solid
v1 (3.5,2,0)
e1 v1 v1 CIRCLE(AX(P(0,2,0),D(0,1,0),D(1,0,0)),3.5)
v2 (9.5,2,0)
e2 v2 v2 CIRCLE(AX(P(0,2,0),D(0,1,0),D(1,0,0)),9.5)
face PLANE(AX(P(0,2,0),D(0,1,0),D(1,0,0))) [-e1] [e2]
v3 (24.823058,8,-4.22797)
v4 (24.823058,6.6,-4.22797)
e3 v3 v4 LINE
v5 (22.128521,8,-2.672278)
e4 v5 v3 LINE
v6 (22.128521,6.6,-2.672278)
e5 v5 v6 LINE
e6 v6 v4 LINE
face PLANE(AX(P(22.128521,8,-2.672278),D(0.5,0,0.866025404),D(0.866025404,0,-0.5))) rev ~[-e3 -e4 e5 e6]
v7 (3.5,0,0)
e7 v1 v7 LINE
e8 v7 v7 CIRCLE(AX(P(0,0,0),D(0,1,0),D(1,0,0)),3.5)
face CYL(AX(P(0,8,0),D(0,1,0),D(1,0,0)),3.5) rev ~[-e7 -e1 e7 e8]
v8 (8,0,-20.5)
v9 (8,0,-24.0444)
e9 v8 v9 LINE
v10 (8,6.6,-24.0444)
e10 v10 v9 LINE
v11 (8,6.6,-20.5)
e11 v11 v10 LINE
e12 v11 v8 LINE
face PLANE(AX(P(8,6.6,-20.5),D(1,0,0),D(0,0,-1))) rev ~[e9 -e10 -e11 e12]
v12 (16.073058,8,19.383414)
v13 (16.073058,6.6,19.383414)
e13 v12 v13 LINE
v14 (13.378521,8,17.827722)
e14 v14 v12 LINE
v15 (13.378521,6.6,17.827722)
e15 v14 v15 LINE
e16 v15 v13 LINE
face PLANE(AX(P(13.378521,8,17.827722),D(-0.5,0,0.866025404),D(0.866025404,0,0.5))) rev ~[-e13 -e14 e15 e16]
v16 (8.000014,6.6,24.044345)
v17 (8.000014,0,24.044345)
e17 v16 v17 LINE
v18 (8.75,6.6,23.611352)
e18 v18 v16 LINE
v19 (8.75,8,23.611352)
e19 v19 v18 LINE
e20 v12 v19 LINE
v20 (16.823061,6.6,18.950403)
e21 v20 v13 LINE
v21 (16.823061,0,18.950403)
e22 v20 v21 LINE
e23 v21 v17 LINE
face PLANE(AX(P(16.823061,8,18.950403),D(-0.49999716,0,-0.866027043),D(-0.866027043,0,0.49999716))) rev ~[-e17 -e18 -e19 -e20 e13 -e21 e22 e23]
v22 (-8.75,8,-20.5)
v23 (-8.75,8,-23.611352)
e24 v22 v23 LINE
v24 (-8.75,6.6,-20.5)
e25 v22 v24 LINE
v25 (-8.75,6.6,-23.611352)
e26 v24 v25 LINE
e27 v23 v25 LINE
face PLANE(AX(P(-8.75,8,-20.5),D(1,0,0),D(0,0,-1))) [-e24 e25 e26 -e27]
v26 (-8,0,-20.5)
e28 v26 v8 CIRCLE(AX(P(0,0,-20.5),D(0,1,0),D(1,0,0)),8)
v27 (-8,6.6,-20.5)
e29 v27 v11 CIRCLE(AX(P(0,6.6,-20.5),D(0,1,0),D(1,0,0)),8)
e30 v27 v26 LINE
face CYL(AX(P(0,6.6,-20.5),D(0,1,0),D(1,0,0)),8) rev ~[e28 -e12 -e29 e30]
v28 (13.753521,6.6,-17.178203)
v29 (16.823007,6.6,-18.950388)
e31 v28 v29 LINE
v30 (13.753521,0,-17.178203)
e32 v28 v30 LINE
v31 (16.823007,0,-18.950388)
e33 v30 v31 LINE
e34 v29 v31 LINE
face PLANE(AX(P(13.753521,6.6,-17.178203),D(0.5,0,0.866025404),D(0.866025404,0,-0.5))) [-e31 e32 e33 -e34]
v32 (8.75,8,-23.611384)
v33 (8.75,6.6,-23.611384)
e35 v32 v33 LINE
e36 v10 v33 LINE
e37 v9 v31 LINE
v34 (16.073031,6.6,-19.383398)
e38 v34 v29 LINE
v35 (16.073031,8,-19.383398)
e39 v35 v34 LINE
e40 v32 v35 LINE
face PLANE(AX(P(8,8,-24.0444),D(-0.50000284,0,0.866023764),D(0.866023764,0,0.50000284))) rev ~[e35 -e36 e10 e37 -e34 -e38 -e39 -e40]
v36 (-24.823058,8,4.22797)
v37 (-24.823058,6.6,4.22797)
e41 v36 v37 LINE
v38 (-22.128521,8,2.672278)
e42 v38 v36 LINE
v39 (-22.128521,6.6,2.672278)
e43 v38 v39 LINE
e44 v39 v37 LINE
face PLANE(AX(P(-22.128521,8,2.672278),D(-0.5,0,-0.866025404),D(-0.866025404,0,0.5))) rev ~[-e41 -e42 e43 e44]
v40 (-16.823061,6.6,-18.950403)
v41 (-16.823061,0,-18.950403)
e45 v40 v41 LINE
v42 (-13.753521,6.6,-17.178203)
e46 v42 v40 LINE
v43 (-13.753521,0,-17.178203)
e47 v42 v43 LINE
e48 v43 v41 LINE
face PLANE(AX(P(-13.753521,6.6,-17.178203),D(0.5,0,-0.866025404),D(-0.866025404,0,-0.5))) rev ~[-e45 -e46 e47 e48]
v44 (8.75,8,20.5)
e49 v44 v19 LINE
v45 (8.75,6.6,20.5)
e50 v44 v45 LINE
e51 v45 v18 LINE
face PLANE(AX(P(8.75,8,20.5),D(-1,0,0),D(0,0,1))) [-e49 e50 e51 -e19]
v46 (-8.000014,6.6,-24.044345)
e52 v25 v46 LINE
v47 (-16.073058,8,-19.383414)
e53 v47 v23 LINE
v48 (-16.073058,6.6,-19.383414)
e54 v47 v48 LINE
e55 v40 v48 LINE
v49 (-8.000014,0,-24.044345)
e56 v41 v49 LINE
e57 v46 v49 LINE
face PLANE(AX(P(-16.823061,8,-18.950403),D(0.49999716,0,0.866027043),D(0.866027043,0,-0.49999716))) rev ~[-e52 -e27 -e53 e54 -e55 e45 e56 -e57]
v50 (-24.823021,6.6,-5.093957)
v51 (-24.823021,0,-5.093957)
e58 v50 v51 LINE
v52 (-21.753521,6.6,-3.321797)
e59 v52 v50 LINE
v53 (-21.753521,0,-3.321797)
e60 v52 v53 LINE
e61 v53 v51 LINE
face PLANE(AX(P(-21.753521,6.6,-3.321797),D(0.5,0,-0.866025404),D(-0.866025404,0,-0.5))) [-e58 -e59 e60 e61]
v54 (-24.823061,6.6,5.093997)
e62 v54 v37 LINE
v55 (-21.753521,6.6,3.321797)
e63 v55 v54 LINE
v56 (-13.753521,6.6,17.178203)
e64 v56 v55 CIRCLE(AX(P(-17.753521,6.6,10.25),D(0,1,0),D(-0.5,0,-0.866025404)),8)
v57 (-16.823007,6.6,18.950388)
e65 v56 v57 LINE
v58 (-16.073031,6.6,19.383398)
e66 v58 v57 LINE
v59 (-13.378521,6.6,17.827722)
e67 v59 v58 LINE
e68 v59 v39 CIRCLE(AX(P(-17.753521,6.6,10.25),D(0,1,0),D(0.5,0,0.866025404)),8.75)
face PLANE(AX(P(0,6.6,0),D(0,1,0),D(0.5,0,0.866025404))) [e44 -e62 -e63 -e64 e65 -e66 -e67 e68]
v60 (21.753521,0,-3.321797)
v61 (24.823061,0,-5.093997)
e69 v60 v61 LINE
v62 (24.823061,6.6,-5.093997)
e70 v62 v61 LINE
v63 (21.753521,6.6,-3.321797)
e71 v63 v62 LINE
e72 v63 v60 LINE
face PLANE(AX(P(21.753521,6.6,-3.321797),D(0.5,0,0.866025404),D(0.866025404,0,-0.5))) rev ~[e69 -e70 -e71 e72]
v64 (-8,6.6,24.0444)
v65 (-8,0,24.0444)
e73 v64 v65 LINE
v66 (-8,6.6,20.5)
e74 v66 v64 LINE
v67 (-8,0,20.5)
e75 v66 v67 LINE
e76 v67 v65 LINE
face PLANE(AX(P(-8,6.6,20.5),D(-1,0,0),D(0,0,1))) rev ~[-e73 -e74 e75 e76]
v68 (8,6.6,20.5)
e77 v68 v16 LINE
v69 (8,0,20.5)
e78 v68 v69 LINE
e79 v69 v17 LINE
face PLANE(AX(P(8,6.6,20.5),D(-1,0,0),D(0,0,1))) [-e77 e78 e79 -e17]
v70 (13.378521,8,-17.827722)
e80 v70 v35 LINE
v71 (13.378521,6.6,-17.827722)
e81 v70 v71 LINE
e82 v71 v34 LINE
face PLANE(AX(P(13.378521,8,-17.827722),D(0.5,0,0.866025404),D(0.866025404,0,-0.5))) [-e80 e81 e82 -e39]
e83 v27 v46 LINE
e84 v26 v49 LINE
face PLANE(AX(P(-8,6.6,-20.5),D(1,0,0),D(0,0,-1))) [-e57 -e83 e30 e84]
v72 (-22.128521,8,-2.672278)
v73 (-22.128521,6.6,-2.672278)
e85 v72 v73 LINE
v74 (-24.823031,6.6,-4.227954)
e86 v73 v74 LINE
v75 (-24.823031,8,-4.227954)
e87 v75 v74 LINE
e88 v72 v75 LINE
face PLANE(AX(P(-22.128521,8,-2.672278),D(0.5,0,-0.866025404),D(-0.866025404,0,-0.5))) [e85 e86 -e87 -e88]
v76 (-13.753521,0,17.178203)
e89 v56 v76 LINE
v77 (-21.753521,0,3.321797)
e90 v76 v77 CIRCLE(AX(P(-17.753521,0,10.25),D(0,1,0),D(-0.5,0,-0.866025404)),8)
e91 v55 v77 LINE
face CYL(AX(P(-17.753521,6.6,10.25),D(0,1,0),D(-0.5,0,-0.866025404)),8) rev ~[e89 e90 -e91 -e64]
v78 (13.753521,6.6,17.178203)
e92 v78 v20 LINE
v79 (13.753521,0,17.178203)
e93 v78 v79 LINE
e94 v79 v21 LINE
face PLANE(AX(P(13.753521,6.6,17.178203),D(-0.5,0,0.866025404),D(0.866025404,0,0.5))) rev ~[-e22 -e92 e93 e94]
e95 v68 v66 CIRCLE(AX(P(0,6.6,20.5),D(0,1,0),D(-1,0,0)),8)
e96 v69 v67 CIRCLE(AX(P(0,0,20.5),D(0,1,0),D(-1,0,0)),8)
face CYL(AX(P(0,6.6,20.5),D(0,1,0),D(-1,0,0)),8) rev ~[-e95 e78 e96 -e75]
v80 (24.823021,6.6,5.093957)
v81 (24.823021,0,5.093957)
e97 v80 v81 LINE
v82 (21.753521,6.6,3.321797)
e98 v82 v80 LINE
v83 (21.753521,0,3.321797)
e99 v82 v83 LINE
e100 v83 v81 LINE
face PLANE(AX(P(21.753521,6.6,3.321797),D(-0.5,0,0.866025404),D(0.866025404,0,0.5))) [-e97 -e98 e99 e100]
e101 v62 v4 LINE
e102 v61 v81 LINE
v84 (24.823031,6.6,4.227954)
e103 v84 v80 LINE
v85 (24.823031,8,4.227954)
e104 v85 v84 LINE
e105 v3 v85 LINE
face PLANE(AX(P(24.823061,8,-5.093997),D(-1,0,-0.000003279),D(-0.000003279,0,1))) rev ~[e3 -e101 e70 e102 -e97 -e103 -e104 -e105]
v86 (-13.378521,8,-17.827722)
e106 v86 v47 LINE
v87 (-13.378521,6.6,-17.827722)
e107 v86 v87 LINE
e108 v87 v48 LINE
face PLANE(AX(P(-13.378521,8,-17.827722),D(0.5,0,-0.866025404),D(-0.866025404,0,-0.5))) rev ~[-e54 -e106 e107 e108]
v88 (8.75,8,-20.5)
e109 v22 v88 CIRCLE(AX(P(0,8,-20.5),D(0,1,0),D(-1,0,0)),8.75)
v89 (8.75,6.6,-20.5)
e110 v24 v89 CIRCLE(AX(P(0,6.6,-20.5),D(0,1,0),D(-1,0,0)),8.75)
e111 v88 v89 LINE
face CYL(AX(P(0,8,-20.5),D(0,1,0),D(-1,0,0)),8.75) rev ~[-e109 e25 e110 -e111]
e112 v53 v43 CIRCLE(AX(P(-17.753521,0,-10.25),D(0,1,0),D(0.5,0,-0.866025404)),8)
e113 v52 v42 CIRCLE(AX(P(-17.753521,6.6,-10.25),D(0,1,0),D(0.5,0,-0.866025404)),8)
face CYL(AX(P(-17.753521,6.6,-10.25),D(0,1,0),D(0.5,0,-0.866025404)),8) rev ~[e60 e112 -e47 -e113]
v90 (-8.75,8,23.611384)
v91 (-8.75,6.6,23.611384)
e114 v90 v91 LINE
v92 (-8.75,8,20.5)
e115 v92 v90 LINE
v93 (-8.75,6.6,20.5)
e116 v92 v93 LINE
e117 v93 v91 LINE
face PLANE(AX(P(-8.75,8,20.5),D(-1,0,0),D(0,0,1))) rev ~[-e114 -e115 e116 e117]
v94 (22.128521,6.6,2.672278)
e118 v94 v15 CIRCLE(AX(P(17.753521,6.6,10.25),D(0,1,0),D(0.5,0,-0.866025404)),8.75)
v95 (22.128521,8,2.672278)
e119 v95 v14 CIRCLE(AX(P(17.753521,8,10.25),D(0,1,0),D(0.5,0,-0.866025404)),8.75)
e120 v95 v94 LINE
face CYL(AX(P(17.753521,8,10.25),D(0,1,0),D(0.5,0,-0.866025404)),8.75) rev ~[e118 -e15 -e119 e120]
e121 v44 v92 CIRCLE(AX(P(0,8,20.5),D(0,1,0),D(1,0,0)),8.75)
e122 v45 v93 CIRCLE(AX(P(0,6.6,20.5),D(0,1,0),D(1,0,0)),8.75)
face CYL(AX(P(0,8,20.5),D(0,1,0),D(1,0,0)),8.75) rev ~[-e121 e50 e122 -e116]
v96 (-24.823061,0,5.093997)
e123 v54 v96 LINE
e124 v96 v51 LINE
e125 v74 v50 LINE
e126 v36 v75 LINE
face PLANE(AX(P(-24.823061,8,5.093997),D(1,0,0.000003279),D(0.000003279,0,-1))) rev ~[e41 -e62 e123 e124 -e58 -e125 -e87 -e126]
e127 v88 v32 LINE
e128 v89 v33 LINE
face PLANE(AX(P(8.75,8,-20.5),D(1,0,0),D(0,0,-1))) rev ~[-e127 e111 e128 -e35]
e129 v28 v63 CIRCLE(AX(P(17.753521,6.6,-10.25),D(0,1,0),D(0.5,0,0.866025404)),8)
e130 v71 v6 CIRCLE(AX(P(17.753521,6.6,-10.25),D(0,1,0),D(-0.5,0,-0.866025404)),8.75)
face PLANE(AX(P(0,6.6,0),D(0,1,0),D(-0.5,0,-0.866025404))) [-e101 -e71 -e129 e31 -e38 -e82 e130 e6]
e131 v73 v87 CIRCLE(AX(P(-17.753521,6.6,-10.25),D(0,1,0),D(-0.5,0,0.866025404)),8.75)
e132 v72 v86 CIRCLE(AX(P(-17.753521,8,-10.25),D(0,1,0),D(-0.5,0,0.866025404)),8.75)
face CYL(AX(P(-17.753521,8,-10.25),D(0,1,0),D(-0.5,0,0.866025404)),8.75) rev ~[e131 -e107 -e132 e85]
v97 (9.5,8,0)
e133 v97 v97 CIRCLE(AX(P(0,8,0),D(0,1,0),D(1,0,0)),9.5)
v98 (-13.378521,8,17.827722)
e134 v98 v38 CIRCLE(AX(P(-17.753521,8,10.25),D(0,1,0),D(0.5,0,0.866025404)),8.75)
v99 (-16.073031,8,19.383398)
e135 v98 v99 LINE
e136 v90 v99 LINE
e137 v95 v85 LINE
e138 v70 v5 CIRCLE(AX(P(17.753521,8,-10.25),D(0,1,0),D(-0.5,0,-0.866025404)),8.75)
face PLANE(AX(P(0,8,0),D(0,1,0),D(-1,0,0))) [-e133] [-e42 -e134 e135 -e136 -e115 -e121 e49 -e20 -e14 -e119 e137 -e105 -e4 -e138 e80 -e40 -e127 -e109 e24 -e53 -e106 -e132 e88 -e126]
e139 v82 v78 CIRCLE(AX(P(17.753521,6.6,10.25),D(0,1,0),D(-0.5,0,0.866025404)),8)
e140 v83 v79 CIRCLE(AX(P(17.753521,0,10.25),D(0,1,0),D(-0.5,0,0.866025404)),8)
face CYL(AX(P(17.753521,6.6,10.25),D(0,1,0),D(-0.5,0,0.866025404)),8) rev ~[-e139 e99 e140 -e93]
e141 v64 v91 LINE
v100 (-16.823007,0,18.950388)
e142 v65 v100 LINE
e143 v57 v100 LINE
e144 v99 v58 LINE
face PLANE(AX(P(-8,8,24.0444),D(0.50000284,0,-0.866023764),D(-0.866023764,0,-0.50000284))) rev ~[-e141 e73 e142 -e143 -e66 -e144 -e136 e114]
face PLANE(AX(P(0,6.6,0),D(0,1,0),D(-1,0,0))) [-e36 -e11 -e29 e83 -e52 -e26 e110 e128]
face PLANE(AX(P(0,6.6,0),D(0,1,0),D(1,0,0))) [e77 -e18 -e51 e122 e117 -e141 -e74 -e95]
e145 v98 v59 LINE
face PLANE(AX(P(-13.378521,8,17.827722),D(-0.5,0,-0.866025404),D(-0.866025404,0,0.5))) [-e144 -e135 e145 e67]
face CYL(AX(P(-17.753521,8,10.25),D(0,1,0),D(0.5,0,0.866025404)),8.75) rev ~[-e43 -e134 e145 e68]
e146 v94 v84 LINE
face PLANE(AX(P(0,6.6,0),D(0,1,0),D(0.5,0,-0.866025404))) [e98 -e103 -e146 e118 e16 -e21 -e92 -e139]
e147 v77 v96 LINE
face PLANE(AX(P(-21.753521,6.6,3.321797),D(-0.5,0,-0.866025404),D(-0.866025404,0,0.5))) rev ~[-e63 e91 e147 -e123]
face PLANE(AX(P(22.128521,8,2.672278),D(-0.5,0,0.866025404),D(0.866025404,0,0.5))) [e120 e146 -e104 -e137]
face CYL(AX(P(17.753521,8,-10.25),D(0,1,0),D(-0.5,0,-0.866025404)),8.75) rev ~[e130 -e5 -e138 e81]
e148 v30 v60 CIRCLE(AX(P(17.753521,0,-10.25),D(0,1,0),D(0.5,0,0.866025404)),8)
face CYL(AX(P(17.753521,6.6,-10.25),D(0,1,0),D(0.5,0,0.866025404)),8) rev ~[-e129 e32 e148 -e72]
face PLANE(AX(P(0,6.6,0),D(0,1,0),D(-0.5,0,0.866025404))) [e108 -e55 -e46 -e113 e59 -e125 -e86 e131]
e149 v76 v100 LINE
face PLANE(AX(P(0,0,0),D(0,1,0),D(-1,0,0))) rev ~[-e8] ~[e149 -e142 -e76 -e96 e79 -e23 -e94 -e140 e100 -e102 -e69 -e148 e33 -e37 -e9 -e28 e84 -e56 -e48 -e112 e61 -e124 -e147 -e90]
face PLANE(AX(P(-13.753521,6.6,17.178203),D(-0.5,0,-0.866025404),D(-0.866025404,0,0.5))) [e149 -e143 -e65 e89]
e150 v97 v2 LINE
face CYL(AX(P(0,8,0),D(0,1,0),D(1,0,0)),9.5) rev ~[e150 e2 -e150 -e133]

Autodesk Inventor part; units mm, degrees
ref_plane "YZ Plane" through (0, 0, 0) normal (1, 0, 0) x (0, 1, 0)
ref_plane "XZ Plane" through (0, 0, 0) normal (0, 1, 0) x (-1, 0, 0)
ref_plane "XY Plane" through (0, 0, 0) normal (0, 0, 1) x (1, 0, 0)
sketch "Sketch1" plane through (0, 0, 0) normal (0, 1, 0) x (-1, 0, 0)
  circle A0 centre (0, 0) radius 30
  circle A1 centre (0, 20.5) radius 8.75
  circle A2 centre (-17.7535, 10.25) radius 8.75
  circle A3 centre (-17.7535, -10.25) radius 8.75
  circle A4 centre (0, -20.5) radius 8.75
  circle A5 centre (17.7535, -10.25) radius 8.75
  circle A6 centre (17.7535, 10.25) radius 8.75
  circle A7 centre (20.5, 0) radius 7.5
  circle A8 centre (14.4957, 14.4957) radius 7.5
  circle A9 centre (0, 20.5) radius 7.5
  circle A10 centre (-14.4957, 14.4957) radius 7.5
  circle A11 centre (-20.5, 0) radius 7.5
  circle A12 centre (-14.4957, -14.4957) radius 7.5
  circle A13 centre (0, -20.5) radius 7.5
  circle A14 centre (14.4957, -14.4957) radius 7.5
  dimension "d0" = 60
  dimension "d19" = 17.5
  dimension "d20" = 20.5
  dimension "d23" = 360
  dimension "d25" = 15
  dimension "d26" = 20.5
  dimension "d29" = 360
extrude "Extrusion1" add sketch "Sketch1" along normal blind 8 contours A0 | A1 A8 A10 | A10 A1 | A1 A10 A2 | A8 A6 A1 | A1 A8 | A1 A8 A6 A7 A5 A14 A4 A12 A3 A11 A2 A10 | A10 A2 A11 | A2 A10 | A8 A6 | A6 A7 A8 | A11 A2 | A2 A11 A3 | A11 A3 A12 | A3 A11 | A7 A6 | A6 A7 A5 | A12 A3 | A3 A12 A4 | A7 A5 A14 | A5 A7 | A12 A4 A14 | A4 A12 | A14 A5 | A5 A14 A4 | A4 A14 | A9 | A13
sketch "Sketch2" plane through (0, 8, 0) normal (0, 1, 0) x (1, 0, 0)
  circle A0 centre (0, -20.5) radius 8.75
  line L0 (-8.75, -20.5) -> (-8.75, -28.6956)
  line L1 (8.75, -20.5) -> (8.75, -28.6956)
  circle A1 centre (0, 0) radius 30 projected
  dimension "d3" = 17.5
  dimension "d4" = 20.5
extrude "Extrusion2" cut sketch "Sketch2" against normal blind 1.4 contours A0 | L1 A1 L0 A0 picked at (-5.5585, -28.7503)
sketch "Sketch3" plane through (0, 6.6, 20.5) normal (0, 1, 0) x (-1, 0, 0)
  arc A0 (-8.75, 0) -> (8.75, 0) centre (0, 0) ccw projected
  circle A1 centre (0, 0) radius 8
  line L0 (8, 0) -> (8, 8.4137)
  line L1 (-8, 0) -> (-8, 8.4137)
  arc A2 (8.75, 8.1956) -> (-8.75, 8.1956) centre (0, -20.5) ccw projected
  dimension "d7" = 16
extrude "Extrusion3" cut sketch "Sketch3" against normal through all
pattern_circular "Circular Pattern1" count 6 over 360 about axis through (0, 0, 0) along (0, 1, 0) of "Extrusion2", "Extrusion3"
sketch "Sketch7" plane through (0, 8, 0) normal (0, 1, 0) x (1, 0, 0)
  arc A0 (8, -20.5) -> (-8, -20.5) centre (0, -20.5) ccw projected
  circle A1 centre (0, -20.5) radius 8.75
  arc A2 (-13.7535, -17.1782) -> (-21.7535, -3.3218) centre (-17.7535, -10.25) ccw projected
  circle A3 centre (-17.7535, -10.25) radius 8.75
  line L0 (-21.04, -21.385) -> (-13.7535, -17.1782) projected
  line L1 (-8, -28.9137) -> (-8, -20.5) projected
  line L2 (-8, -24.0444) -> (-16.823, -18.9504)
  arc A4 (-20.4761, -21.9255) -> (-8.75, -28.6956) centre (0, 0) ccw projected
  arc A5 (-21.04, -21.385) -> (-20.4761, -21.9255) centre (0, 0) ccw projected
  arc A6 (-8.75, -28.6956) -> (-8, -28.9137) centre (0, 0) ccw projected
  dimension "d32" = 17.5
  dimension "d33" = 17.5
extrude "Extrusion6" cut sketch "Sketch7" against normal blind 10 contours L1 A6 A4 A5 L0 L2
pattern_circular "Circular Pattern2" count 6 over 360 about axis through (0, -10, 0) along (0, 1, 0) of "Extrusion6"
sketch "Sketch4" plane through (0, 8, 0) normal (0, 1, 0) x (1, 0, 0)
  circle A0 centre (0, 0) radius 3.5
  dimension "d13" = 7
extrude "Extrusion4" cut sketch "Sketch4" against normal through all
sketch "Sketch8" plane through (0, 8, 0) normal (0, 1, 0) x (1, 0, 0)
  circle A0 centre (0, 0) radius 9.5
  dimension "d39" = 19
extrude "Extrusion7" cut sketch "Sketch8" against normal blind 6
equation "\"d26\" = d20"
equation "\"d4\" = d20"
properties part number "motor_3DPrint"
